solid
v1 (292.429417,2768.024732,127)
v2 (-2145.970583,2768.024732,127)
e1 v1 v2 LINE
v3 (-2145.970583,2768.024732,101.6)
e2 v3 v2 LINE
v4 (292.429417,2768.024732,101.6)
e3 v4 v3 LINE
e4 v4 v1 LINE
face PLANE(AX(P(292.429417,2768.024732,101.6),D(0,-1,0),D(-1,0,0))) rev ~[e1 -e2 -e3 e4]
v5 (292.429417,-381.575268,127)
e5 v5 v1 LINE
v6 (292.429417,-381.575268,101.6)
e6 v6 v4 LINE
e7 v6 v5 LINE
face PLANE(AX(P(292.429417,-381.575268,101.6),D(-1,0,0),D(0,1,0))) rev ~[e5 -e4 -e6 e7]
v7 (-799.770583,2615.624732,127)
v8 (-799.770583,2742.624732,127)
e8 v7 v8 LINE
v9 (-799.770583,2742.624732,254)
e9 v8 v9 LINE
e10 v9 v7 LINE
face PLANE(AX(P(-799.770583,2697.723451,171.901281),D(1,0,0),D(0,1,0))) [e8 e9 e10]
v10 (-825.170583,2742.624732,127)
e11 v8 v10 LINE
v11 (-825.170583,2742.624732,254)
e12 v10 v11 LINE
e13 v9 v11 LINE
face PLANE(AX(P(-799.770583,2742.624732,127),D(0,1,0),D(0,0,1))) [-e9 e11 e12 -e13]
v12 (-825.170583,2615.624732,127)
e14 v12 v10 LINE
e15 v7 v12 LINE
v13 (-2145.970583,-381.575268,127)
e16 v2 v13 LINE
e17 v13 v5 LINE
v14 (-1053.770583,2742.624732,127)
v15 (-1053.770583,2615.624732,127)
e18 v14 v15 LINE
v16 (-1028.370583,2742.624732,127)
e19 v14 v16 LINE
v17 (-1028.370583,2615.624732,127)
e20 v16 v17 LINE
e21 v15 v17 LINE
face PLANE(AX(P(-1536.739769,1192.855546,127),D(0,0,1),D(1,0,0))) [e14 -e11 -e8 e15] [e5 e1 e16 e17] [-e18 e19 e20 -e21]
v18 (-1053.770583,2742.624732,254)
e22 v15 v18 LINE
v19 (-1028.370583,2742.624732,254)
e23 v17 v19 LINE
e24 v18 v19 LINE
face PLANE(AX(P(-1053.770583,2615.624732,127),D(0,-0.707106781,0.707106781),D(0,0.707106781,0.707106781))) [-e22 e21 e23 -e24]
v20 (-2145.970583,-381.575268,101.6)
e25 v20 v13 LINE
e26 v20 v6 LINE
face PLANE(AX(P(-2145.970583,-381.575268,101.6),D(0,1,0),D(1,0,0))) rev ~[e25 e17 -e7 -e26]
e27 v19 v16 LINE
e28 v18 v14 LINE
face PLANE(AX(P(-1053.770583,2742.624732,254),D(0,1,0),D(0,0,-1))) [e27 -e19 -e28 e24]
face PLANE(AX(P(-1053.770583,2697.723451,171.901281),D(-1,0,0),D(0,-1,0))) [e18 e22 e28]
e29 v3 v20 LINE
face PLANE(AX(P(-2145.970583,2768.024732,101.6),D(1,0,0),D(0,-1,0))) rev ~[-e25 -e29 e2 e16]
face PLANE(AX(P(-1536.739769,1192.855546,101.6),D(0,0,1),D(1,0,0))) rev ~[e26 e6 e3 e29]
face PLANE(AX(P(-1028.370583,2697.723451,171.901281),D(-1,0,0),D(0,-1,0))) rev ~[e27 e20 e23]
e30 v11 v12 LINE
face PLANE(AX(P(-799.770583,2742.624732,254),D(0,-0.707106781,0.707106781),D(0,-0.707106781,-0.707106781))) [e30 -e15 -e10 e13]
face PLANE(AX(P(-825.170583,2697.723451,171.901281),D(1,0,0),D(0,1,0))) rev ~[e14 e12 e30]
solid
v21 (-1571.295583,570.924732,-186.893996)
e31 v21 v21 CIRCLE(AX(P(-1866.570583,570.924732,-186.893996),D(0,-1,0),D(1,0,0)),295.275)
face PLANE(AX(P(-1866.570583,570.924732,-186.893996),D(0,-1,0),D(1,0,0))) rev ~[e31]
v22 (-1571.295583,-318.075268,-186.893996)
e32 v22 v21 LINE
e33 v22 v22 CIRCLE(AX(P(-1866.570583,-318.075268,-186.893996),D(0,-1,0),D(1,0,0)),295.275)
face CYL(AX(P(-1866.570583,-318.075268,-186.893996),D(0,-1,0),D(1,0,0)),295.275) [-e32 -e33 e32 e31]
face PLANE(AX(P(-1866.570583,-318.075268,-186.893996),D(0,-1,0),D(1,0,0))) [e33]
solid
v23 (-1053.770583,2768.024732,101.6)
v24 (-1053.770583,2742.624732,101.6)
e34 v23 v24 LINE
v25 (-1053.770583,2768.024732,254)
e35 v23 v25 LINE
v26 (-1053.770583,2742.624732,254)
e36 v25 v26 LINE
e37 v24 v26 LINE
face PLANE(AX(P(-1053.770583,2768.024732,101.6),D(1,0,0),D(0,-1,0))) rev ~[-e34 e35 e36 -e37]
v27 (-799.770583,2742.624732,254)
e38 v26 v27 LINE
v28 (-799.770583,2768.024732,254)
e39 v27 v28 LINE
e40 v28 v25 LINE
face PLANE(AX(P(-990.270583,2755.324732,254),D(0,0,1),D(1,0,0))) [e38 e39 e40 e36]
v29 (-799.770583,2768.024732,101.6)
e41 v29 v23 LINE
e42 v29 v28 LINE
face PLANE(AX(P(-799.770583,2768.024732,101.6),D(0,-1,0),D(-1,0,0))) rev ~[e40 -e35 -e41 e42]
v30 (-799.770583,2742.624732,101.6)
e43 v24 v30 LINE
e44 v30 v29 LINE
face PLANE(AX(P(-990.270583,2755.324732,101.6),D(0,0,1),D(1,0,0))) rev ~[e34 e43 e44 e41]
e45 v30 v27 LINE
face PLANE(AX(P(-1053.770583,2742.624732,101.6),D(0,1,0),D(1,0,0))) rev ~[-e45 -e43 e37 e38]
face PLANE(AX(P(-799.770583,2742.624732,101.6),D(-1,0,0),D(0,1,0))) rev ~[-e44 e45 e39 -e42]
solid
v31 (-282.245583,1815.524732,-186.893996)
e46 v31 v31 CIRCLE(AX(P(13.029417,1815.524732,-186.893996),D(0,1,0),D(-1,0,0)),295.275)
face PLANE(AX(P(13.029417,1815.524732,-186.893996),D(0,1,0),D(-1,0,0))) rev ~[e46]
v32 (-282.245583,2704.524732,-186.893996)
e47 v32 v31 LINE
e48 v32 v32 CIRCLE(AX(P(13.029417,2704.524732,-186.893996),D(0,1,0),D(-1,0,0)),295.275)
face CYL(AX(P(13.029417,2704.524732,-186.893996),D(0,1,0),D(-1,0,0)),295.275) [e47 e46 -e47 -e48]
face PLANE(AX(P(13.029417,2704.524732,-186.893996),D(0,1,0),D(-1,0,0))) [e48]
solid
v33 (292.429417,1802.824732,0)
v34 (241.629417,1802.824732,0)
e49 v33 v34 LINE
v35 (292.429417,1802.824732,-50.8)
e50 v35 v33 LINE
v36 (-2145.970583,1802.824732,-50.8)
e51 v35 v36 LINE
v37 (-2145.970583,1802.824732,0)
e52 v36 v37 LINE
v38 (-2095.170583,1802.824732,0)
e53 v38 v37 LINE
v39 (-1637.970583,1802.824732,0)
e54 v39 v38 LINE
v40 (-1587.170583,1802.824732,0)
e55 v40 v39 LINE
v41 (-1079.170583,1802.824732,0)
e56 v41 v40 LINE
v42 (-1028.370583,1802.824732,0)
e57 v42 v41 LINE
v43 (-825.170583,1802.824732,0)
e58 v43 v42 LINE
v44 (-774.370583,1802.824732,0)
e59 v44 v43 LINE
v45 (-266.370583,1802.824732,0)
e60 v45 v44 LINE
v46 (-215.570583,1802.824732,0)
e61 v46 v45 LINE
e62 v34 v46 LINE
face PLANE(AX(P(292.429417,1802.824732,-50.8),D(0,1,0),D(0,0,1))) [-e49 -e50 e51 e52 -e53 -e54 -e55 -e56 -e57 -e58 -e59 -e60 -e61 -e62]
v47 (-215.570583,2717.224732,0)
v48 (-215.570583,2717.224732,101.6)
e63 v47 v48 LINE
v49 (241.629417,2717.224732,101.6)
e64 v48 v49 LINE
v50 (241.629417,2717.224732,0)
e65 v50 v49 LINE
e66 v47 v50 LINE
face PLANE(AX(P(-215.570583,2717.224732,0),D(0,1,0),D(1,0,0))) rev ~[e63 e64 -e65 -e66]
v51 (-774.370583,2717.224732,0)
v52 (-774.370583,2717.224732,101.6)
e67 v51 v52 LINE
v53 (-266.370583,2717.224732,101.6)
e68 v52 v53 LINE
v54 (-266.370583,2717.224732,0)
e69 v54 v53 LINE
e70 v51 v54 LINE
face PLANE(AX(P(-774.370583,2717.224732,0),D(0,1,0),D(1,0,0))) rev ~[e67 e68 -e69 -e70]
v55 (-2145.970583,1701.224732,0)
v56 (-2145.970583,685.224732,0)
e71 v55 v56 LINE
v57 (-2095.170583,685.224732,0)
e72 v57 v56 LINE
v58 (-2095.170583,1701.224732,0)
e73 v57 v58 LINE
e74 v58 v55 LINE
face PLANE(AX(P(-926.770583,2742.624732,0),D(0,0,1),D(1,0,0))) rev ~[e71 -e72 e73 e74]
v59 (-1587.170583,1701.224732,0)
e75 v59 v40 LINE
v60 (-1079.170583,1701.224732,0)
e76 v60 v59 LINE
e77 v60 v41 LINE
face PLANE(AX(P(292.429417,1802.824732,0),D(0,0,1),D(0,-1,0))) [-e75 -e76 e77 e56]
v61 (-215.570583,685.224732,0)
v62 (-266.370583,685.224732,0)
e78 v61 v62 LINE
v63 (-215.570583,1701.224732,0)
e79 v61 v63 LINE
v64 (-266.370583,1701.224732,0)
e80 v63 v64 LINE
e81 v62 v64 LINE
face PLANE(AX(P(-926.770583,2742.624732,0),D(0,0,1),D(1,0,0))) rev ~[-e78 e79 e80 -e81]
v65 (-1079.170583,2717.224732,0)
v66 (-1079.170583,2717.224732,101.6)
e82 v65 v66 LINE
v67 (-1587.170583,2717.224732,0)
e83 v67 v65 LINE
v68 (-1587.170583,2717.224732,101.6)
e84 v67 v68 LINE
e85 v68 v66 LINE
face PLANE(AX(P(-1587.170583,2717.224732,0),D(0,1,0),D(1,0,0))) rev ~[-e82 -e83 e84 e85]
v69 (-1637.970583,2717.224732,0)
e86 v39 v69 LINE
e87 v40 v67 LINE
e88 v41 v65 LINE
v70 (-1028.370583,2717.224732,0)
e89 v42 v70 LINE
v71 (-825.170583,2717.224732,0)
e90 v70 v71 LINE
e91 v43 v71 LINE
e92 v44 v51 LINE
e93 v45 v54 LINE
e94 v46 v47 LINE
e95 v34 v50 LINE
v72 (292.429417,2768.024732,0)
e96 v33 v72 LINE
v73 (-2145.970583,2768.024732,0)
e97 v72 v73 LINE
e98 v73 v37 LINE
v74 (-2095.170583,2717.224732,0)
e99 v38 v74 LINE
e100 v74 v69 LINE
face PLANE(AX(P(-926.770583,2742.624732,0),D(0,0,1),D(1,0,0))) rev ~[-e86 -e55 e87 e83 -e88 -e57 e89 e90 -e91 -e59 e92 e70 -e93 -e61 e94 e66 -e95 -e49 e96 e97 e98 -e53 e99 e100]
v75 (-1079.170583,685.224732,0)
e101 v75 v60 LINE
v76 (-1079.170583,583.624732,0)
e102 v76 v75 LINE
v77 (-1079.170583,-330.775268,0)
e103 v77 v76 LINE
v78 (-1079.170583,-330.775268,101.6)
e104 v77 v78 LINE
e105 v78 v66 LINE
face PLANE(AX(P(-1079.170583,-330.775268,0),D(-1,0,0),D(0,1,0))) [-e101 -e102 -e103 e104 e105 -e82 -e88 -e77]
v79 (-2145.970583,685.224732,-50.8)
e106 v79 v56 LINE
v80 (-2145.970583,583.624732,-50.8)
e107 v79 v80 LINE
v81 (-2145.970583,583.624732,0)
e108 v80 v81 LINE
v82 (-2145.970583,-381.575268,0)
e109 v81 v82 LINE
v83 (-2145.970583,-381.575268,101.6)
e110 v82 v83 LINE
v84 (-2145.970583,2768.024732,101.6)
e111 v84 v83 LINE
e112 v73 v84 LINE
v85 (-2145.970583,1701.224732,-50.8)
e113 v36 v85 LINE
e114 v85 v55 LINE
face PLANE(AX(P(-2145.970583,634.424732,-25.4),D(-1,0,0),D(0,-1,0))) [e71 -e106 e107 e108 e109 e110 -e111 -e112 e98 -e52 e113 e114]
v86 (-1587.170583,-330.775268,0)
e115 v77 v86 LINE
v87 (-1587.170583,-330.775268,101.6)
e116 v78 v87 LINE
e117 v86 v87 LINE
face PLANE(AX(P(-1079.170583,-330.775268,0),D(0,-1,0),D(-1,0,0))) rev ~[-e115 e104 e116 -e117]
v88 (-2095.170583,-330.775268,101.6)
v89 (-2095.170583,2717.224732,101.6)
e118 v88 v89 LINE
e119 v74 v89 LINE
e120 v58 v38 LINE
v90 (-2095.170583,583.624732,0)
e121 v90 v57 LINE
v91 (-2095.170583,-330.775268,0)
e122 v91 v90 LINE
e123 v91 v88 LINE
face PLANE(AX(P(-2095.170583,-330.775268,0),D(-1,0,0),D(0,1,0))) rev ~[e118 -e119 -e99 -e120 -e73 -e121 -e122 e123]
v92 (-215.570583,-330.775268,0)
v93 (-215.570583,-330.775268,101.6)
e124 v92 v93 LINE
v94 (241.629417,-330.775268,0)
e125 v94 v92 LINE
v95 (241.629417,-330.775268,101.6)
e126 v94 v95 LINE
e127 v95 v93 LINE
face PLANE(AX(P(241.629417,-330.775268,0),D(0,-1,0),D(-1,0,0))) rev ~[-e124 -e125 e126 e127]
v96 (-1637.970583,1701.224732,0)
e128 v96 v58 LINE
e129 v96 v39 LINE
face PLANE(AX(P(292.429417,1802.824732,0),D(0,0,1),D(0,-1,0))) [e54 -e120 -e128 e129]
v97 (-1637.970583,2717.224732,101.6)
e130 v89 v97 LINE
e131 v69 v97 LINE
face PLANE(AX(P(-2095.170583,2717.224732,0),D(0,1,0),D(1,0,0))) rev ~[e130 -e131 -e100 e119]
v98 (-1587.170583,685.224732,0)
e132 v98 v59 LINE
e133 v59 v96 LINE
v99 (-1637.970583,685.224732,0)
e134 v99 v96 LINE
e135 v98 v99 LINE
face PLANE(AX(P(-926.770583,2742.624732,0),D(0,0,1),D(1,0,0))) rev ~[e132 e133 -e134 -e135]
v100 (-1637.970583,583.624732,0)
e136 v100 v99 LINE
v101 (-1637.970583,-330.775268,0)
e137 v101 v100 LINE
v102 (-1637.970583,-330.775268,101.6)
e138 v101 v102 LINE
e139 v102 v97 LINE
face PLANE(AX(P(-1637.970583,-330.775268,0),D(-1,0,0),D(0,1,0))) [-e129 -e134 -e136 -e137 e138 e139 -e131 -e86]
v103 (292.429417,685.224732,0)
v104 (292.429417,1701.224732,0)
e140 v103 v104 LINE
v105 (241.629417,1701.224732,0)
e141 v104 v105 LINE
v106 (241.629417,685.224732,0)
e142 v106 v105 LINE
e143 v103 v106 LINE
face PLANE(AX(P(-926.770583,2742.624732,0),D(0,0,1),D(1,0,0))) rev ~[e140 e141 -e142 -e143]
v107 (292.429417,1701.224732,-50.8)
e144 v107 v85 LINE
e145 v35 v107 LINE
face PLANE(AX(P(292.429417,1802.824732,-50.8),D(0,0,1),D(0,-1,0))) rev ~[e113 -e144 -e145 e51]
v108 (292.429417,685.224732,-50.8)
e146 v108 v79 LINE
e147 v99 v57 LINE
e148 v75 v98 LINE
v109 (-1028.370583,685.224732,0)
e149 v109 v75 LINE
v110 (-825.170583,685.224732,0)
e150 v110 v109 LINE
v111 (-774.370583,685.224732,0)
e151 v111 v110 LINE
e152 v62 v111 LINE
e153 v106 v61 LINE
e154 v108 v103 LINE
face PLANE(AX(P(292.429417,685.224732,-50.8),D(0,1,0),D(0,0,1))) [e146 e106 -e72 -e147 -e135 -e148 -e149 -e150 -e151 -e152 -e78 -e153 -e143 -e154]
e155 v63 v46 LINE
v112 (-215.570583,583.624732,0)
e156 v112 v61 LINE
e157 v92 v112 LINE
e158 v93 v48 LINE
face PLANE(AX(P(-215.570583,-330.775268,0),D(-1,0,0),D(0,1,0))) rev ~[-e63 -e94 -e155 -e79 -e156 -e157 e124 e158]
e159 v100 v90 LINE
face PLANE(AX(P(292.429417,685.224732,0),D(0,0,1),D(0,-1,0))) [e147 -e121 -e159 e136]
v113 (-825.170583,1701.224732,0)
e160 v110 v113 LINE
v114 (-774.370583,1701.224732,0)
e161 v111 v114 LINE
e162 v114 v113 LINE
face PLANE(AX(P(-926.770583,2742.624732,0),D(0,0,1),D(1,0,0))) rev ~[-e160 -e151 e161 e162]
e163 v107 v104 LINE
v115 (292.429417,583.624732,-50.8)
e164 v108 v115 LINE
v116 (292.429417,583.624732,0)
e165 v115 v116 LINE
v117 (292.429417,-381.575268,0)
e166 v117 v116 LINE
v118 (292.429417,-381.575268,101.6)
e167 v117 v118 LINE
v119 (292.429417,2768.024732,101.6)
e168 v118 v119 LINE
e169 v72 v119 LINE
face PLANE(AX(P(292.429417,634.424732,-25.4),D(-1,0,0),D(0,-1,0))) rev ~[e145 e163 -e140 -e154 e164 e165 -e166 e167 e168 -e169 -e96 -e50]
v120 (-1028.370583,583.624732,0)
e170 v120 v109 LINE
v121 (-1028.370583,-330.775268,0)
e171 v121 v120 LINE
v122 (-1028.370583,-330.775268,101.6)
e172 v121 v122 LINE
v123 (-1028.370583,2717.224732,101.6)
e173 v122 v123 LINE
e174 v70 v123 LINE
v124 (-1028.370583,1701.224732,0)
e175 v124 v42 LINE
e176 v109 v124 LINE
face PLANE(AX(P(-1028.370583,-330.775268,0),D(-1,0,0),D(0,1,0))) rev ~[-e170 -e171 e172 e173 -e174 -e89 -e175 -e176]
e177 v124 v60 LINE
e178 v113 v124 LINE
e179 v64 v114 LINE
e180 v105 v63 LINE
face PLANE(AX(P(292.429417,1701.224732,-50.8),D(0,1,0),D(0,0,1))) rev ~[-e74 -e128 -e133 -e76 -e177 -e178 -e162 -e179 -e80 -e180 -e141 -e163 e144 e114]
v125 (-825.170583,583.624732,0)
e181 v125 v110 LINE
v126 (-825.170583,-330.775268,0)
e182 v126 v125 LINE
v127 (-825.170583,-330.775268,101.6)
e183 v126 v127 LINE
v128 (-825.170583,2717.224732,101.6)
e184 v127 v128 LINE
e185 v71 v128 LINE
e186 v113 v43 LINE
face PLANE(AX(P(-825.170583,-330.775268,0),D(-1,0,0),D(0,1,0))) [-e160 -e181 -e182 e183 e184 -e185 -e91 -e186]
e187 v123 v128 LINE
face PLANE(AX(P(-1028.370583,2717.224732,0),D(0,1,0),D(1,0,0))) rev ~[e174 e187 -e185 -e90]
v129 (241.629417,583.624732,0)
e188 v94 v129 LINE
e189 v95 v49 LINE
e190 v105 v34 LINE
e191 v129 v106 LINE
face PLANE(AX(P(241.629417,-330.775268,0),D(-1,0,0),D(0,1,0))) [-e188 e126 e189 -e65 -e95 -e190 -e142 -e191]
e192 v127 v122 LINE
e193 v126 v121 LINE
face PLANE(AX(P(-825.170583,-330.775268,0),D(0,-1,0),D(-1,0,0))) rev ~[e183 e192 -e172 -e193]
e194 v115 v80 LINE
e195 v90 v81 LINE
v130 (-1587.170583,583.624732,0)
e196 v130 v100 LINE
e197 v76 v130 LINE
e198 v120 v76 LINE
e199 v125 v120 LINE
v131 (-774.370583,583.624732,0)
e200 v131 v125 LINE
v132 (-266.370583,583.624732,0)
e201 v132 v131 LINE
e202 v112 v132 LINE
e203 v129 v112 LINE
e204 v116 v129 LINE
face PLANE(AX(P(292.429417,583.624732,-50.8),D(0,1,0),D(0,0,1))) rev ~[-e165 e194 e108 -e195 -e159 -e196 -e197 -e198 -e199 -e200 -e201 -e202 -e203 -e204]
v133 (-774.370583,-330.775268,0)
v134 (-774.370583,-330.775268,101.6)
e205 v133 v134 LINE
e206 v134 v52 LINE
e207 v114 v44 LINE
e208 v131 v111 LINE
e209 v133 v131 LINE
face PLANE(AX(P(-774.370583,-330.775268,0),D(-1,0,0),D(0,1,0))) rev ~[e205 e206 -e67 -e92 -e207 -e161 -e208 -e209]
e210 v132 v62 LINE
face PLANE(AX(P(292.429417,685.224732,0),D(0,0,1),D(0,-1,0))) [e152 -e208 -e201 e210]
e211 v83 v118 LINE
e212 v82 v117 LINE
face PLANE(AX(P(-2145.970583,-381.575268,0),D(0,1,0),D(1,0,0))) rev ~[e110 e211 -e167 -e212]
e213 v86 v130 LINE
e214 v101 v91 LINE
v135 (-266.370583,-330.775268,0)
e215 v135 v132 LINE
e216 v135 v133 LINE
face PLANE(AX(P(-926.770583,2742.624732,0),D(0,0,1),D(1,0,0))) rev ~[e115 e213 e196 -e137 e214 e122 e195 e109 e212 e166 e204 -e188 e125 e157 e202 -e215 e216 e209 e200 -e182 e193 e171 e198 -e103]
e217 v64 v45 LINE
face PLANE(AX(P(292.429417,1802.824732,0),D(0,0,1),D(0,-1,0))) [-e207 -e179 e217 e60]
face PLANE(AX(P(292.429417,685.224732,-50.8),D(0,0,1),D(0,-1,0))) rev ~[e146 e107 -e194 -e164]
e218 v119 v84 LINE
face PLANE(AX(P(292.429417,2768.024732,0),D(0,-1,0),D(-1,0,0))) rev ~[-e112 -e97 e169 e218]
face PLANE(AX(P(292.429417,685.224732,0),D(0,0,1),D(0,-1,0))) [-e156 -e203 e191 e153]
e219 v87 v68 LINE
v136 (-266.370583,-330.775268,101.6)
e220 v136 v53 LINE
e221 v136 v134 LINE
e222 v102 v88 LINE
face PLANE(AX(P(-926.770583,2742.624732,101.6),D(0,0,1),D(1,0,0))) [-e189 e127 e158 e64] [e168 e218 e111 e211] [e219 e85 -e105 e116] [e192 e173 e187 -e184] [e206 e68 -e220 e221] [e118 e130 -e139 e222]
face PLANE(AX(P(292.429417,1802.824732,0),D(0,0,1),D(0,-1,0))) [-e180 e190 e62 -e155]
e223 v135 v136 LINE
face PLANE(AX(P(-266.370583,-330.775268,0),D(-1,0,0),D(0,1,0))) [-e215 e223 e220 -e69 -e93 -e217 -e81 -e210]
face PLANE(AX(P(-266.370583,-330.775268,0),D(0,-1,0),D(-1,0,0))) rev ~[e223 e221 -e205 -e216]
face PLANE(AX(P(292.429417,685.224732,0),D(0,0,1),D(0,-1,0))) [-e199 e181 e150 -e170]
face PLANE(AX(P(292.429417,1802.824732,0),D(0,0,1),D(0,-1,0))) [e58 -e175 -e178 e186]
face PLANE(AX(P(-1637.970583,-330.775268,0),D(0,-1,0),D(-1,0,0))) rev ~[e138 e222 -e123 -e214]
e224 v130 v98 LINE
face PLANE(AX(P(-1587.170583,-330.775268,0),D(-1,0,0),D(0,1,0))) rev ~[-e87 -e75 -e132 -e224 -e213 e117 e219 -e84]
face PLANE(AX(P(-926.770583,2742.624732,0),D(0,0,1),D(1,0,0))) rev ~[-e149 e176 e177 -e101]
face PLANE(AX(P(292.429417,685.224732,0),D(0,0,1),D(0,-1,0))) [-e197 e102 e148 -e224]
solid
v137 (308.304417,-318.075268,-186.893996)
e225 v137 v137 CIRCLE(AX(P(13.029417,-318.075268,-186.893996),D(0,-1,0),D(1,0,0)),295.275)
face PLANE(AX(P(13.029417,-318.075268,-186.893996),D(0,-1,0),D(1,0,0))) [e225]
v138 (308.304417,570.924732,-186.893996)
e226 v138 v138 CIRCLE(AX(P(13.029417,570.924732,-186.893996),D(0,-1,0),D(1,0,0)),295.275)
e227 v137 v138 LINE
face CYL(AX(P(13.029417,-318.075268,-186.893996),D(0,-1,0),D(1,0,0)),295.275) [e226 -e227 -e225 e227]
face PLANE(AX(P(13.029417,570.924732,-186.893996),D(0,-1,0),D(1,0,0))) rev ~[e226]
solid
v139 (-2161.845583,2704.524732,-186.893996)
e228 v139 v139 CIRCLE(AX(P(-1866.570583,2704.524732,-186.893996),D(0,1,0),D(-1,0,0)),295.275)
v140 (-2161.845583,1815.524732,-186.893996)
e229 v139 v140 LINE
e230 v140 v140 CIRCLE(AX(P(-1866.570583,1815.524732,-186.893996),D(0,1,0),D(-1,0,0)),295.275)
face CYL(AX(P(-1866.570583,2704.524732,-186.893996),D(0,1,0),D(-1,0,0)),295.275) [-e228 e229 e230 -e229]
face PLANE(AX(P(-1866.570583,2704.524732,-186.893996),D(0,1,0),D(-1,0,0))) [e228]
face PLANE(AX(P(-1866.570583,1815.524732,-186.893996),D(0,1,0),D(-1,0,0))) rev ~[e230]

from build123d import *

# Parameters (mm, degrees)
F0_W      = 50.8
F0_H      = 3048
F1_DEPTH  = 101.6
F6_W      = 101.6
F6_H      = 50.8
F7_DEPTH  = 2438.4
F5_R      = 295.275
F8_DEPTH  = 889
F9_R      = 295.275
F10_DEPTH = 889
F12_W     = 127
F12_H     = 25.4
F13_DEPTH = 25.4
F14_DEPTH = 152.4
F16_DEPTH = 25.4
F18_DEPTH = 25.4


with BuildPart() as f1:
    # F0 (on Top) → F1 (new body)
    with BuildSketch(Plane.XY):
        Polygon((-2145.970582962, 2768.0247317466), (-2145.970582962, 2717.2247317466), (-2095.170582962, 2717.2247317466), (-1637.970582962, 2717.2247317466), (-1587.170582962, 2717.2247317466), (-1079.170582962, 2717.2247317466), (-1028.370582962, 2717.2247317466), (-825.170582962, 2717.2247317466), (-774.370582962, 2717.2247317466), (-266.370582962, 2717.2247317466), (-215.570582962, 2717.2247317466), (241.629417038, 2717.2247317466), (292.429417038, 2717.2247317466), (292.429417038, 2768.0247317466), align=None)
        with Locations((-2120.570582962, 1193.2247317466)):
            Rectangle(F0_W, F0_H)
        Polygon((-2095.170582962, -330.7752682534), (-2145.970582962, -330.7752682534), (-2145.970582962, -381.5752682534), (292.429417038, -381.5752682534), (292.429417038, -330.7752682534), (241.629417038, -330.7752682534), (-215.570582962, -330.7752682534), (-266.370582962, -330.7752682534), (-774.370582962, -330.7752682534), (-825.170582962, -330.7752682534), (-1028.370582962, -330.7752682534), (-1079.170582962, -330.7752682534), (-1587.170582962, -330.7752682534), (-1637.970582962, -330.7752682534), align=None)
        with Locations((267.029417038, 1193.2247317466)):
            Rectangle(F0_W, F0_H)
        with Locations((-1612.570582962, 1193.2247317466)):
            Rectangle(F0_W, F0_H)
        with Locations((-1053.770582962, 1193.2247317466)):
            Rectangle(F0_W, F0_H)
        with Locations((-799.770582962, 1193.2247317466)):
            Rectangle(F0_W, F0_H)
        with Locations((-240.970582962, 1193.2247317466)):
            Rectangle(F0_W, F0_H)
    extrude(amount=F1_DEPTH)

    # F6 (on offset) → F7 (join)
    with BuildSketch(Plane(origin=(292.429417038, 0, 0), x_dir=(0, -1, 0), z_dir=(-1, 0, 0))):
        with Locations((-634.4247317466, -25.4)):
            Rectangle(F6_W, F6_H)
        with Locations((-1752.0247317466, -25.4)):
            Rectangle(F6_W, F6_H)
    extrude(amount=F7_DEPTH)


with BuildPart() as f8:
    # F5 (on offset) → F8 (new body)
    with BuildSketch(Plane.XZ.offset(318.0752682534)):
        with Locations((13.029417038, -186.8939956901)):
            Circle(F5_R)
    extrude(amount=-F8_DEPTH)


with BuildPart() as f8b:
    # F5 (on offset) → F8, piece 2 (new body)
    with BuildSketch(Plane.XZ.offset(318.0752682534)):
        with Locations((-1866.570582962, -186.8939956901)):
            Circle(F5_R)
    extrude(amount=-F8_DEPTH)


with BuildPart() as f10:
    # F9 (on offset) → F10 (new body)
    with BuildSketch(Plane(origin=(0, 2704.5247317466, 0), x_dir=(-1, 0, 0), z_dir=(0, 1, 0))):
        with Locations((-13.029417038, -186.8939956901)):
            Circle(F9_R)
    extrude(amount=-F10_DEPTH)


with BuildPart() as f10b:
    # F9 (on offset) → F10, piece 2 (new body)
    with BuildSketch(Plane(origin=(0, 2704.5247317466, 0), x_dir=(-1, 0, 0), z_dir=(0, 1, 0))):
        with Locations((1866.570582962, -186.8939956901)):
            Circle(F9_R)
    extrude(amount=-F10_DEPTH)


with BuildPart() as f13:
    # F12 (on offset) → F13 (new body)
    with BuildSketch(Plane.XY.offset(101.6)):
        Polygon((-1053.770582962, 2768.0247317466), (-2145.970582962, 2768.0247317466), (-2145.970582962, -381.5752682534), (-926.770582962, -381.5752682534), (-926.770582962, 2742.6247317466), (-1053.770582962, 2742.6247317466), align=None)
        Polygon((-1028.370582962, 2768.0247317466), (-1053.770582962, 2768.0247317466), (-1053.770582962, 2742.6247317466), (-926.770582962, 2742.6247317466), (-926.770582962, 2768.0247317466), align=None)
        Polygon((-926.770582962, 2742.6247317466), (-926.770582962, -381.5752682534), (292.429417038, -381.5752682534), (292.429417038, 2768.0247317466), (-799.770582962, 2768.0247317466), (-799.770582962, 2742.6247317466), align=None)
        with Locations((-863.270582962, 2755.3247317466)):
            Rectangle(F12_W, F12_H)
    extrude(amount=F13_DEPTH)

    # F15 (on face) → F16 (join)
    with BuildSketch(Plane.YZ.offset(-799.770582962)):
        Polygon((2742.6247317466, 127), (2742.6247317466, 254), (2615.6247317466, 127), align=None)
    extrude(amount=-F16_DEPTH)

    # F17 (on face) → F18 (join)
    with BuildSketch(Plane(origin=(-1053.770582962, 0, 0), x_dir=(0, -1, 0), z_dir=(-1, 0, 0))):
        Polygon((-2742.6247317466, 127), (-2615.6247317466, 127), (-2742.6247317466, 254), align=None)
    extrude(amount=-F18_DEPTH)


with BuildPart() as f14:
    # F12 (on offset) → F14 (new body)
    with BuildSketch(Plane.XY.offset(101.6)):
        Polygon((-1028.370582962, 2768.0247317466), (-1053.770582962, 2768.0247317466), (-1053.770582962, 2742.6247317466), (-926.770582962, 2742.6247317466), (-926.770582962, 2768.0247317466), align=None)
        with Locations((-863.270582962, 2755.3247317466)):
            Rectangle(F12_W, F12_H)
    extrude(amount=F14_DEPTH)


solid = Compound([f1.part, f8.part, f8b.part, f10.part, f10b.part, f13.part, f14.part])
